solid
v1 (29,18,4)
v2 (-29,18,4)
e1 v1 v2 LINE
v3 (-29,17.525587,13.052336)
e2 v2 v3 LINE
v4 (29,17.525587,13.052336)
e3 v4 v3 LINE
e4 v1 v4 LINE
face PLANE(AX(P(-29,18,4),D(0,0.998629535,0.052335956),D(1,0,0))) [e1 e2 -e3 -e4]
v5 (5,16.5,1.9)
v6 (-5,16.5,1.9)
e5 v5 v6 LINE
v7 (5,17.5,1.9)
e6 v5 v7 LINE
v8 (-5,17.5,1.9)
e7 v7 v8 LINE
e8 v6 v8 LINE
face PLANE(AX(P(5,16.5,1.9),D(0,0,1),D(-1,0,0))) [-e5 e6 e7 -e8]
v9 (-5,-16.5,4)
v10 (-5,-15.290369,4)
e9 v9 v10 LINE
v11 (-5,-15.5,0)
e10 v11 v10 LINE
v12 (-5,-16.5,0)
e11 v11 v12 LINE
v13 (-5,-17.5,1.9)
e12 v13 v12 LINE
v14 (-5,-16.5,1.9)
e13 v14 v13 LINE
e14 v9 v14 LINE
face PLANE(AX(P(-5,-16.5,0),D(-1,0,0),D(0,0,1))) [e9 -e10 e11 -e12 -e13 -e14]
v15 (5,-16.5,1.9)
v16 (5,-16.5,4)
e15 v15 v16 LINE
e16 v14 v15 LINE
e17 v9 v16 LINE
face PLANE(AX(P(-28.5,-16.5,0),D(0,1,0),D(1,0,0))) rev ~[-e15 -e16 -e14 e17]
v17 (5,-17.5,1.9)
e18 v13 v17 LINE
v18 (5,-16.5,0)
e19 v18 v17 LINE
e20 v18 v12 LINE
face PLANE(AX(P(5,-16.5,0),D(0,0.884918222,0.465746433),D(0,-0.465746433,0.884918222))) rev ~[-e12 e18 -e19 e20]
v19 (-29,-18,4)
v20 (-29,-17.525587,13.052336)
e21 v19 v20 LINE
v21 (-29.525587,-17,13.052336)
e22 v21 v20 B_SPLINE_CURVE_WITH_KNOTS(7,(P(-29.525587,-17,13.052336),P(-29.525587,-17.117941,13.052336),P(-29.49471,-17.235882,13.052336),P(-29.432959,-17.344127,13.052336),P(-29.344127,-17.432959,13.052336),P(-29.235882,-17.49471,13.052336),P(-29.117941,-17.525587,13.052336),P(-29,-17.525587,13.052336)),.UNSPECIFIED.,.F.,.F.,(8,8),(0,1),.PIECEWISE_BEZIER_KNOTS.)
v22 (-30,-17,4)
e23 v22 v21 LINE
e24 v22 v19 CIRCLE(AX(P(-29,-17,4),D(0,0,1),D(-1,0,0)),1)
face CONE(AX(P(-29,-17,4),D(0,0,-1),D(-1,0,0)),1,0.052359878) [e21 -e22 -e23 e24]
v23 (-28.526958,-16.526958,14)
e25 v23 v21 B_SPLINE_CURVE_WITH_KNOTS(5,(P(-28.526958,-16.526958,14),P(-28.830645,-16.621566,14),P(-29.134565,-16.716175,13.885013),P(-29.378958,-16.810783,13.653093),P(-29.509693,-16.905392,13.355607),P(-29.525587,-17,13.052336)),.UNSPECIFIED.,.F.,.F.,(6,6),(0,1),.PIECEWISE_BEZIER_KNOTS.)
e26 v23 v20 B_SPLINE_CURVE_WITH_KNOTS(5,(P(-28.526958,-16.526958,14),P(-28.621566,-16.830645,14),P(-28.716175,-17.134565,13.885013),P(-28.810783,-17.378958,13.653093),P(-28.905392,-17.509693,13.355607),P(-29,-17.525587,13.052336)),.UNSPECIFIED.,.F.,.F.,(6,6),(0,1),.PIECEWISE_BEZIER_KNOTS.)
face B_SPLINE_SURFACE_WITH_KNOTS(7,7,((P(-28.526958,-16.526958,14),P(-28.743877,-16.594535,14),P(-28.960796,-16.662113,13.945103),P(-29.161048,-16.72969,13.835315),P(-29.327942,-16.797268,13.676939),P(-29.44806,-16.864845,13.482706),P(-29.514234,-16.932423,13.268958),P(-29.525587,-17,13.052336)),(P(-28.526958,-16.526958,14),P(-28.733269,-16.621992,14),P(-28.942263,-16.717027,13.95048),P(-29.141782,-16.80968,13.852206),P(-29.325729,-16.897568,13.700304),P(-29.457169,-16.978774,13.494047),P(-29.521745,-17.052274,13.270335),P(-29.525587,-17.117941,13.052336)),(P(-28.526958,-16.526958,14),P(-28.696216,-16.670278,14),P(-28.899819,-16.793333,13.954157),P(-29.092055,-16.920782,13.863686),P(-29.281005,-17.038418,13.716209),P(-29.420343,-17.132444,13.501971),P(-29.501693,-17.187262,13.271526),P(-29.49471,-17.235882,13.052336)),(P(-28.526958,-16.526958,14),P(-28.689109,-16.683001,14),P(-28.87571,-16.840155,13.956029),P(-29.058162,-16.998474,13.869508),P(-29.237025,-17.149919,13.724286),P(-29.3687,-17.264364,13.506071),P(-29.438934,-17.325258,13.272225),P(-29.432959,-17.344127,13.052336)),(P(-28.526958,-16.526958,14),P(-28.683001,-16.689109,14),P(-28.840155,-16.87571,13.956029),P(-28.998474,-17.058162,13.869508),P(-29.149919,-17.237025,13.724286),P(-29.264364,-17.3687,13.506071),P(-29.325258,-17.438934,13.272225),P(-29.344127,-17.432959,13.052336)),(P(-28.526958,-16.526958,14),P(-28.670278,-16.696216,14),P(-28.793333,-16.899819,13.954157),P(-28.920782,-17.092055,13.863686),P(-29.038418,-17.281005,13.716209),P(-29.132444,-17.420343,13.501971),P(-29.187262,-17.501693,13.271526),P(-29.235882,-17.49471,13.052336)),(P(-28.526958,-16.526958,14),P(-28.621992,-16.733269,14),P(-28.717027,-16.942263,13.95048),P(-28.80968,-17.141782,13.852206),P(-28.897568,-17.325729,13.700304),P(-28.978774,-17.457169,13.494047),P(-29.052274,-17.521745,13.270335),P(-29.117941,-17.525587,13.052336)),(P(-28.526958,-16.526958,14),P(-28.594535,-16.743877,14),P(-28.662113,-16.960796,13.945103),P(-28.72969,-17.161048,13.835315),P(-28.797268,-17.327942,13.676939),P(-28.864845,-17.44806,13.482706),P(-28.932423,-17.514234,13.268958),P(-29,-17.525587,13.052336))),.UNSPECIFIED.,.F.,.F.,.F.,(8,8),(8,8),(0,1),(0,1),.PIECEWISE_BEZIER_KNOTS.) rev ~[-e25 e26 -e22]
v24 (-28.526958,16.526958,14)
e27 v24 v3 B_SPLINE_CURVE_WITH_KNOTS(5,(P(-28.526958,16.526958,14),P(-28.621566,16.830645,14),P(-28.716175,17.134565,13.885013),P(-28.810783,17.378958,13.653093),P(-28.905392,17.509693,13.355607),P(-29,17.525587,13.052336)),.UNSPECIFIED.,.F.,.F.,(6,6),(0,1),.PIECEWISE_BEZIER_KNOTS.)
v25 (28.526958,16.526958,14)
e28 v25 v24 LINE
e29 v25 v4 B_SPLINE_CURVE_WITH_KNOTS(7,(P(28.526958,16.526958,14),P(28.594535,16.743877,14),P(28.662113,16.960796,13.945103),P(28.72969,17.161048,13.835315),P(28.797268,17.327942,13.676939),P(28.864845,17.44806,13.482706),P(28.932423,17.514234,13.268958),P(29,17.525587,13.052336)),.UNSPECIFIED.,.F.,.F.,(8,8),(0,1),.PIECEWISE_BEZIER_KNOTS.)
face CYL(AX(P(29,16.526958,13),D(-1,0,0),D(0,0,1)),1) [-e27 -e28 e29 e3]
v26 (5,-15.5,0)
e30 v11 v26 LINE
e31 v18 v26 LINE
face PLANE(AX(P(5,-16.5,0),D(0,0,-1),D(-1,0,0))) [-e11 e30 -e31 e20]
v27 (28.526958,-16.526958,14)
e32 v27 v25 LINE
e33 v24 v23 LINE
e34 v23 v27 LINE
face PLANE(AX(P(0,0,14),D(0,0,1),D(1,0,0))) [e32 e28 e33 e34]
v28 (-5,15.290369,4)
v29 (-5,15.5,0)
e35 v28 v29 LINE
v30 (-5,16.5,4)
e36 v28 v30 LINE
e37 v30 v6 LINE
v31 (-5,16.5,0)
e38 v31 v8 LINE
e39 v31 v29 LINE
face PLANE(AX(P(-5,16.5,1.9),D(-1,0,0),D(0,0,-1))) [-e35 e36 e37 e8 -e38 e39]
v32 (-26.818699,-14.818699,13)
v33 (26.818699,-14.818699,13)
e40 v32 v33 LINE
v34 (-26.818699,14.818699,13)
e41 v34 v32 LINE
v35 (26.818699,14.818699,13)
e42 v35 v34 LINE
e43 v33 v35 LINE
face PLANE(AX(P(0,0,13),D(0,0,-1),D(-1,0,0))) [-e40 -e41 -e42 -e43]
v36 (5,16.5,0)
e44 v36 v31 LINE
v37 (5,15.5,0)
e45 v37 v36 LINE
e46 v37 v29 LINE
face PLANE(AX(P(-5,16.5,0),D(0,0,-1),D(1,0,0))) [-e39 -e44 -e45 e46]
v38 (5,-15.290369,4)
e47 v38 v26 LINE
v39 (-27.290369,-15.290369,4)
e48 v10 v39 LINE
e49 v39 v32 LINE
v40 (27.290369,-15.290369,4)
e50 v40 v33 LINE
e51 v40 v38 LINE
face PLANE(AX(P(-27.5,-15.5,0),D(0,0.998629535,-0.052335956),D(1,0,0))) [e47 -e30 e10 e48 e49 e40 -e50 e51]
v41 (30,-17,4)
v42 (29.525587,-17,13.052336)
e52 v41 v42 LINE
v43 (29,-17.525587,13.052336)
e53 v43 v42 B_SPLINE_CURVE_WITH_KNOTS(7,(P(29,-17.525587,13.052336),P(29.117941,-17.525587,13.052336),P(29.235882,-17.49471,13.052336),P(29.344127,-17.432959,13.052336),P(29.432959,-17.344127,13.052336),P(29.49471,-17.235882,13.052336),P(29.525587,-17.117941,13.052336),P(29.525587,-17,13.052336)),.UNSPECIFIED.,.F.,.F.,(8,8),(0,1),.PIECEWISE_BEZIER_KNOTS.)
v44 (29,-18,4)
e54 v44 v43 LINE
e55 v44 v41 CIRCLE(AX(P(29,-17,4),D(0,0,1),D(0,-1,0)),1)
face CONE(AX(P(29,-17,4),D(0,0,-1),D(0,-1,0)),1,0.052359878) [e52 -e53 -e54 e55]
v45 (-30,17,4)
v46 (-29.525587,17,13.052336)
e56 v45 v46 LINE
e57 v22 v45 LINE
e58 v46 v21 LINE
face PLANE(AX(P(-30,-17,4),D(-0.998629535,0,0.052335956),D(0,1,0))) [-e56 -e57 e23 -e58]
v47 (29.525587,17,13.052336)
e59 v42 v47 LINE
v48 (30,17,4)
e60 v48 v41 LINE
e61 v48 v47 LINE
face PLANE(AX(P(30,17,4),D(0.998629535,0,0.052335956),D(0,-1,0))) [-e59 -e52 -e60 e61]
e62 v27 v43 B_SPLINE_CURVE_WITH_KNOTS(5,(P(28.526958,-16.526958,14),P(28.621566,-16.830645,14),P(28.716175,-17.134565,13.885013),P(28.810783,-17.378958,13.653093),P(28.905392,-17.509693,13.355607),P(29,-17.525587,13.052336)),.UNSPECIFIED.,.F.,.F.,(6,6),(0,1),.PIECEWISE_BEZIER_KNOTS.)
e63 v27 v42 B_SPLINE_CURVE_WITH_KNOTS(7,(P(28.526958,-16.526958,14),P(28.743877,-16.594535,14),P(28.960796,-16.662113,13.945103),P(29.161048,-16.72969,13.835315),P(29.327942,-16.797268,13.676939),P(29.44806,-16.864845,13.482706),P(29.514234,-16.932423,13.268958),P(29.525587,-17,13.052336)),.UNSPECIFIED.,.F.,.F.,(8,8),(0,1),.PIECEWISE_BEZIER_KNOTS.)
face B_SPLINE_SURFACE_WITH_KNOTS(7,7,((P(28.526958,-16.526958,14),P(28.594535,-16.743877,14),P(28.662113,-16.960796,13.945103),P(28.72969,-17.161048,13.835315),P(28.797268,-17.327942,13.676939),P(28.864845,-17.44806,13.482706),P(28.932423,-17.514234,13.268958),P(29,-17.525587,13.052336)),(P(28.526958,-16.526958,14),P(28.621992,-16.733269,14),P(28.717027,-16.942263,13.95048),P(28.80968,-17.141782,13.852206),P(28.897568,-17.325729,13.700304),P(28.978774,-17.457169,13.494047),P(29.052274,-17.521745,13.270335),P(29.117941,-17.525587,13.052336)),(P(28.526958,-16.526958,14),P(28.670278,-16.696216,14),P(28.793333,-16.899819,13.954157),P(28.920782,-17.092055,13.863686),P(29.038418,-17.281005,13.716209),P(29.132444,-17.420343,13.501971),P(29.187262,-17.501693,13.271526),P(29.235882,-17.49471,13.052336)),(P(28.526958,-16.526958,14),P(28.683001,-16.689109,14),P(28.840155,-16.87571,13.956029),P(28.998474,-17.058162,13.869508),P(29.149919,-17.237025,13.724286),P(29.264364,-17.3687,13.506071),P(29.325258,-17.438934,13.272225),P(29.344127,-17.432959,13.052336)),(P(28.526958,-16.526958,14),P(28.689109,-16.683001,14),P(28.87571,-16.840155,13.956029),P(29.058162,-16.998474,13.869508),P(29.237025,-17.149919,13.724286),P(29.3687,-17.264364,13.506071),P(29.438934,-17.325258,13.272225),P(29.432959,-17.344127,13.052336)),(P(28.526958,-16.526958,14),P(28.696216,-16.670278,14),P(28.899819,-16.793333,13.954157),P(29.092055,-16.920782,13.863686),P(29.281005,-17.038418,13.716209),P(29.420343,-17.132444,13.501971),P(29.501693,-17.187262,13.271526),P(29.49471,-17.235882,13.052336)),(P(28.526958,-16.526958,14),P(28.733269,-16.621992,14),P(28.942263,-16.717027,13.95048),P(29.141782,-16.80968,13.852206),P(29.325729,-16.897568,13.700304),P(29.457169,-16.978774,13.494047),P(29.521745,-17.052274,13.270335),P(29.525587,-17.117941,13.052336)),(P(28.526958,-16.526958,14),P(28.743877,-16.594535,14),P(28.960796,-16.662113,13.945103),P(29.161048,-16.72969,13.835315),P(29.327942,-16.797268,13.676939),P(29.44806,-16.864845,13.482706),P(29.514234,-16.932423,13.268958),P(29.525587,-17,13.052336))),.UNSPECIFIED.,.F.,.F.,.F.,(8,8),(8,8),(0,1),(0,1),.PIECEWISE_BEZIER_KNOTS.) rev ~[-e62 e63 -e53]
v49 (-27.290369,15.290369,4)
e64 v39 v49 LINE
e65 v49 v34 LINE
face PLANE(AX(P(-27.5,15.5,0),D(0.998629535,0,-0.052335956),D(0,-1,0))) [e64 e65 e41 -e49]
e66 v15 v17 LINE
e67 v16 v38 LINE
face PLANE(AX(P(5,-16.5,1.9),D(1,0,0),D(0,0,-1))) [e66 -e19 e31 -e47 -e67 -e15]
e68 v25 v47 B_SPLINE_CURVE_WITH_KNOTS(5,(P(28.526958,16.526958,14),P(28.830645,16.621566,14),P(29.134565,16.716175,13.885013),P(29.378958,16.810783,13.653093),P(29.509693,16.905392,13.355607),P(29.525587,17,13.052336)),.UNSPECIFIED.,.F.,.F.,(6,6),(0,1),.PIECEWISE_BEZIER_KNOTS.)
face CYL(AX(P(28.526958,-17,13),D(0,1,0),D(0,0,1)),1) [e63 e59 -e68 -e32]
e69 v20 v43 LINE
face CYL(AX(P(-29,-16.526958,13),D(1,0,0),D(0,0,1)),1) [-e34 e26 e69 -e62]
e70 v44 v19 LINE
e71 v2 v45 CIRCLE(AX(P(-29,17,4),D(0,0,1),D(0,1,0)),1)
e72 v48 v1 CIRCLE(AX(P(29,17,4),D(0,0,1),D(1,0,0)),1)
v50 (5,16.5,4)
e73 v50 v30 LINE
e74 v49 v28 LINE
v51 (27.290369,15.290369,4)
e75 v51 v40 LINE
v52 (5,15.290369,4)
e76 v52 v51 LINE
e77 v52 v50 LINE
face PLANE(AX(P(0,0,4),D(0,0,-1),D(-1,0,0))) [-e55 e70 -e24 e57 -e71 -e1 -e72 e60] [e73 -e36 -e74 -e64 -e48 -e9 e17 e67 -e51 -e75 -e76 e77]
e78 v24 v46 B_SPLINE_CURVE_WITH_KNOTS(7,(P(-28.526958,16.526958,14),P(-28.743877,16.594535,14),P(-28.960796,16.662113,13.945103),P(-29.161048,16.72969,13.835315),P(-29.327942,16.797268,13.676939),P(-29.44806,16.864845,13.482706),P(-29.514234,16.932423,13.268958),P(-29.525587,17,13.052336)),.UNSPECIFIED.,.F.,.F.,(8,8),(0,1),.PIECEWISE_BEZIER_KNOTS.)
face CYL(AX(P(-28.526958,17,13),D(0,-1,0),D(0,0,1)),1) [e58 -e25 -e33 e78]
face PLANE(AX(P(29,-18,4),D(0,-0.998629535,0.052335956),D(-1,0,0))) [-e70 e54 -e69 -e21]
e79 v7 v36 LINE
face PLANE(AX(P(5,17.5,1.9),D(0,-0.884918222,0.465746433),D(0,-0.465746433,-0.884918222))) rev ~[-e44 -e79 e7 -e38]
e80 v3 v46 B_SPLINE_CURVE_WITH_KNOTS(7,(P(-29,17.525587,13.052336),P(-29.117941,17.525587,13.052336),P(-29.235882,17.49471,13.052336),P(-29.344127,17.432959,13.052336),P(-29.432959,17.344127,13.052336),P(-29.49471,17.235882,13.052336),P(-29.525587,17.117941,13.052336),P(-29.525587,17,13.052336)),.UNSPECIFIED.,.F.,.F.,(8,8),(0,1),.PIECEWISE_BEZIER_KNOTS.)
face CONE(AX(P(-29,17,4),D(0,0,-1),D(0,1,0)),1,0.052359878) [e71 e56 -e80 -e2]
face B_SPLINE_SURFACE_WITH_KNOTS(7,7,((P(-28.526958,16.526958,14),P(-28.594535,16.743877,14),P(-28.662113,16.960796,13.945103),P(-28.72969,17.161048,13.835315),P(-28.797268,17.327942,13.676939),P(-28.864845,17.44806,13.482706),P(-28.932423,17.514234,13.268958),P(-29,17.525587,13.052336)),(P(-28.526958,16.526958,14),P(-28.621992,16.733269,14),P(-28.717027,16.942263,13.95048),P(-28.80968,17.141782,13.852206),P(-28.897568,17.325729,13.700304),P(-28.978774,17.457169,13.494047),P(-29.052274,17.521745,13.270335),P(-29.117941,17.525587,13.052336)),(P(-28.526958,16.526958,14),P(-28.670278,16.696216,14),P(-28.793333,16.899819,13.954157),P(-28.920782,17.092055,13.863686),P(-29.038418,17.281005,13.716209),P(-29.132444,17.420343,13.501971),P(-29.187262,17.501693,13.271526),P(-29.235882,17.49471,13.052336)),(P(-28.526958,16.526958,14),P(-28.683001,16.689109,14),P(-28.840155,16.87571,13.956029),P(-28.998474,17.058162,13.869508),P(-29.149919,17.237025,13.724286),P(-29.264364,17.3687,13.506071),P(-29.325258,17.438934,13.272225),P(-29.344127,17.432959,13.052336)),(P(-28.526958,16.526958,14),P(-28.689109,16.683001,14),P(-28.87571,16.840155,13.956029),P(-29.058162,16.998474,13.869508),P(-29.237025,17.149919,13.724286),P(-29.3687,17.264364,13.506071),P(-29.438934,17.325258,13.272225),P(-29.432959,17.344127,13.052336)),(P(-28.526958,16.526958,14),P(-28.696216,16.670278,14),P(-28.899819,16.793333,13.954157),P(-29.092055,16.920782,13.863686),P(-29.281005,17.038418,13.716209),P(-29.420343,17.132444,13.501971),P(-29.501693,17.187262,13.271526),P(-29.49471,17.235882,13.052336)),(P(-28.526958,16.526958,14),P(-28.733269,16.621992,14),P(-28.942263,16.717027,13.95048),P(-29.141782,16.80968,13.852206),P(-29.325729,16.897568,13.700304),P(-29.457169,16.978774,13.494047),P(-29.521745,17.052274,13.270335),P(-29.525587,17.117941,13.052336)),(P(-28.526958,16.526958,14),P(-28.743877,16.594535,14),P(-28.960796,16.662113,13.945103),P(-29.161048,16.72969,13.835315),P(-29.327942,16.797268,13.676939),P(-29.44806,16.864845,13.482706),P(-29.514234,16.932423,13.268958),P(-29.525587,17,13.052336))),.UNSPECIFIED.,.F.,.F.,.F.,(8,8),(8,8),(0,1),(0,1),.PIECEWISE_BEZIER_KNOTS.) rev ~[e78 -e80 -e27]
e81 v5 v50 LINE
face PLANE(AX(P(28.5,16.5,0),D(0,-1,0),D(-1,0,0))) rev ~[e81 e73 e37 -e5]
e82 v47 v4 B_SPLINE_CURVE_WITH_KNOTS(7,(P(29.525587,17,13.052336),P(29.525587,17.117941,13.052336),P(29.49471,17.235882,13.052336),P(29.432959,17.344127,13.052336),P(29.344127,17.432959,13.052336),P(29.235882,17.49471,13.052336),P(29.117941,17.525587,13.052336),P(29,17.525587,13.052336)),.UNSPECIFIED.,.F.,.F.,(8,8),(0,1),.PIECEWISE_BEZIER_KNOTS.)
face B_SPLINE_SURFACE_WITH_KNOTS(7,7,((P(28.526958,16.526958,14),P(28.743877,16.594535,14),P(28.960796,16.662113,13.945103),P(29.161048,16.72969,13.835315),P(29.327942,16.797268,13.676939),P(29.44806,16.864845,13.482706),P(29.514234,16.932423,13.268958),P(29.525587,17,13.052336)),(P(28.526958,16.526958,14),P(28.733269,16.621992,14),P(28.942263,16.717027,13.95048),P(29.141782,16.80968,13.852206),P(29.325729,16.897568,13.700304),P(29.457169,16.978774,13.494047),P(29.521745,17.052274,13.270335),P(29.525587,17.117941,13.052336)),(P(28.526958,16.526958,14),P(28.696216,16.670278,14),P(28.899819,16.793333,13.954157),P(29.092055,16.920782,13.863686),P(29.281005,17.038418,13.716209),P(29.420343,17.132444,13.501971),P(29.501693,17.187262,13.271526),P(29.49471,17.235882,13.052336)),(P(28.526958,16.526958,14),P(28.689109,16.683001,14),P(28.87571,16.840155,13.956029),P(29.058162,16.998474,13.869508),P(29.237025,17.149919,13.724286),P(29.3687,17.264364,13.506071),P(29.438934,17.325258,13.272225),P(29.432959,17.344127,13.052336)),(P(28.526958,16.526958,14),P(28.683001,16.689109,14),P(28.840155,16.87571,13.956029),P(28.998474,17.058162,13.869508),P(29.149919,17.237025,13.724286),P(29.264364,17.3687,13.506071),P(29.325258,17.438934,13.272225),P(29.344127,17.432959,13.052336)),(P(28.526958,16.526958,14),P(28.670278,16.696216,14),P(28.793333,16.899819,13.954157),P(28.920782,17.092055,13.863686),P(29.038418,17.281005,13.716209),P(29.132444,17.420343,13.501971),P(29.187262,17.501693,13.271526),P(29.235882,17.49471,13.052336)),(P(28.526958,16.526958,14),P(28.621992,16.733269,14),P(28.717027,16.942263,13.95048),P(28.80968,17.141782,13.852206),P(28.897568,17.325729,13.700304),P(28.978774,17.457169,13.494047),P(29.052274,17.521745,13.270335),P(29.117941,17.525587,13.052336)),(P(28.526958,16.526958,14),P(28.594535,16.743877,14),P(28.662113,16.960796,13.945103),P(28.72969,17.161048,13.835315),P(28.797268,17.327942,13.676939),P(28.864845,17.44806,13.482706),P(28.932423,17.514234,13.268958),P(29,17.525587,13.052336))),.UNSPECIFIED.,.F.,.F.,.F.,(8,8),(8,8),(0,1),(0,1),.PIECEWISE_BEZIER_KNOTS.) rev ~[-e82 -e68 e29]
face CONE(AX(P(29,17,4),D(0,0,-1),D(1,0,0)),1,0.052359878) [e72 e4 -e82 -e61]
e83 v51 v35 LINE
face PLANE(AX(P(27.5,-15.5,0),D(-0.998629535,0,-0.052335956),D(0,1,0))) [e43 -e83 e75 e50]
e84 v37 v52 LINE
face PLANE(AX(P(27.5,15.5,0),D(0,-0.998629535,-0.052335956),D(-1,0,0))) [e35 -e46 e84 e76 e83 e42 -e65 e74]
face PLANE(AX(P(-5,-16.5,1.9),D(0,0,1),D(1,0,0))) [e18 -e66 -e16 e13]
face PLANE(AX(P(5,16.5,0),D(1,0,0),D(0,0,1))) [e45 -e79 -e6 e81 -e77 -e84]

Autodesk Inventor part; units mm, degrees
ref_plane "YZ Plane" through (0, 0, 0) normal (1, 0, 0) x (0, 1, 0)
ref_plane "XZ Plane" through (0, 0, 0) normal (0, 1, 0) x (-1, 0, 0)
ref_plane "XY Plane" through (0, 0, 0) normal (0, 0, 1) x (1, 0, 0)
sketch "Эскиз1" plane through (0, 0, 0) normal (0, 0, 1) x (1, 0, 0)
  line L0 (-29, 18) -> (29, 18)
  line L1 (30, 17) -> (30, -17)
  line L2 (29, -18) -> (-29, -18)
  line L3 (-30, -17) -> (-30, 17)
  arc A0 (-29, 18) -> (-30, 17) centre (-29, 17) ccw
  arc A1 (-30, -17) -> (-29, -18) centre (-29, -17) ccw
  arc A2 (29, -18) -> (30, -17) centre (29, -17) ccw
  arc A3 (30, 17) -> (29, 18) centre (29, 17) ccw
  point P0 (0, 0)
  point P1 (-30, 18)
  point P2 (30, 18)
  point P3 (-30, -18)
  dimension "d0" = 60
  dimension "d1" = 36
  dimension "d2" = 18
  dimension "d3" = 30
  dimension "d4" = 1
extrude "Выдавливание1" add sketch "Эскиз1" along normal blind 4
sketch "Эскиз3" plane through (0, 0, 4) normal (0, 0, 1) x (1, 0, 0)
  line L0 (-29, 18) -> (29, 18)
  line L1 (30, 17) -> (30, -17)
  line L2 (29, -18) -> (-29, -18)
  line L3 (-30, -17) -> (-30, 17)
  line L4 (30, -17) -> (30, 17) projected
  line L5 (-29, -18) -> (29, -18) projected
  line L6 (-30, 17) -> (-30, -17) projected
  line L7 (29, 18) -> (-29, 18) projected
  arc A0 (-29, 18) -> (-30, 17) centre (-29, 17) ccw
  arc A1 (-30, -17) -> (-29, -18) centre (-29, -17) ccw
  arc A2 (29, -18) -> (30, -17) centre (29, -17) ccw
  arc A3 (30, 17) -> (29, 18) centre (29, 17) ccw
  point P0 (0, 0)
  dimension "d7" = 0
  dimension "d8" = 0
  dimension "d9" = 0
  dimension "d10" = 0
  dimension "d11" = 1
extrude "Выдавливание2" add sketch "Эскиз3" along normal blind 10 draft -3
sketch "Эскиз4" plane through (0, 0, 0) normal (0, 0, -1) x (-1, 0, 0)
  line L0 (-27.5, 15.5) -> (27.5, 15.5)
  line L1 (27.5, 15.5) -> (27.5, -15.5)
  line L2 (27.5, -15.5) -> (-27.5, -15.5)
  line L3 (-27.5, -15.5) -> (-27.5, 15.5)
  point P0 (0, 0)
  dimension "d14" = 15.5
  dimension "d15" = 31
  dimension "d16" = 27.5
  dimension "d17" = 55
extrude "Выдавливание3" cut sketch "Эскиз4" against normal blind 13 draft -3
sketch "Эскиз5" plane through (0, 0, 0) normal (0, 0, -1) x (-1, 0, 0)
  line L0 (-28.5, 16.5) -> (28.5, 16.5)
  line L1 (28.5, 16.5) -> (28.5, -16.5)
  line L2 (28.5, -16.5) -> (-28.5, -16.5)
  line L3 (-28.5, -16.5) -> (-28.5, 16.5)
  line L4 (-29, 18) -> (29, 18) projected
  line L5 (-30, -17) -> (-30, 17) projected
  line L6 (29, -18) -> (-29, -18) projected
  line L7 (30, 17) -> (30, -17) projected
  line L8 (-29, 18) -> (29, 18)
  line L9 (30, 17) -> (30, -17)
  line L10 (29, -18) -> (-29, -18)
  line L11 (-30, -17) -> (-30, 17)
  arc A0 (-29, 18) -> (-30, 17) centre (-29, 17) ccw
  arc A1 (-30, -17) -> (-29, -18) centre (-29, -17) ccw
  arc A2 (29, -18) -> (30, -17) centre (29, -17) ccw
  arc A3 (30, 17) -> (29, 18) centre (29, 17) ccw
  point P0 (0, 0)
  point P1 (29, 18)
  dimension "d20" = 1.5
  dimension "d21" = 1.5
  dimension "d22" = 1.5
  dimension "d23" = 1.5
  dimension "d24" = 0
  dimension "d25" = 0
  dimension "d26" = 0
  dimension "d27" = 0
  dimension "d28" = 1
extrude "Выдавливание4" cut sketch "Эскиз5" against normal blind 4
fillet "Сопряжение1" radius 1 8 edges at (-29.3365, -17.3365, 14) (-29.4759, 0, 14) (-29.3365, 17.3365, 14) (0, 17.4759, 14) (29.3365, 17.3365, 14) (29.4759, 0, 14) (29.3365, -17.3365, 14) (0, -17.4759, 14)
sketch "Эскиз6" plane through (-28.5, -16.5, 0) normal (0, -1, 0) x (1, 0, 0)
  line L0 (0, 4) -> (23.5, 4)
  line L1 (23.5, 4) -> (23.5, 0)
  line L2 (23.5, 0) -> (0, 0)
  line L3 (0, 0) -> (0, 4)
  line L4 (33.5, 4) -> (57, 4)
  line L5 (57, 4) -> (57, 0)
  line L6 (57, 0) -> (33.5, 0)
  line L7 (33.5, 0) -> (33.5, 4)
  line L8 (-0.5, 4) -> (57.5, 4) projected
  line L9 (57, 0) -> (0, 0) projected
  line L10 (0, 0) -> (0, 4) projected
  line L11 (57, 0) -> (57, 4) projected
  point P0 (28.5, 0)
  dimension "d32" = 0
  dimension "d33" = 0
  dimension "d34" = 0
  dimension "d35" = 23.5
  dimension "d36" = 0
  dimension "d37" = 23.5
extrude "Выдавливание5" cut sketch "Эскиз6" against normal through all contours L0 L1 L2 L3 | L4 L5 L6 L7
sketch "Эскиз8" plane through (-5, -16.5, 0) normal (0, -1, 0) x (1, 0, 0)
  line L0 (0, 1.9) -> (10, 1.9)
  line L1 (10, 1.9) -> (10, 0)
  line L2 (10, 0) -> (0, 0)
  line L3 (0, 0) -> (0, 1.9)
  line L4 (0, 4) -> (0, 0) projected
  line L5 (10, 0) -> (0, 0) projected
  line L6 (10, 0) -> (10, 4) projected
  point P0 (5, 0)
  dimension "d43" = 0
  dimension "d44" = 0
  dimension "d45" = 0
  dimension "d46" = 1.9
extrude "Выдавливание6" add sketch "Эскиз8" along normal blind 1
sketch "Эскиз9" plane through (-5, 16.5, 0) normal (0, 1, 0) x (1, 0, 0)
  line L0 (10, -1.9) -> (0, -1.9)
  line L1 (0, -1.9) -> (0, 0)
  line L2 (0, 0) -> (10, 0)
  line L3 (10, 0) -> (10, -1.9)
  line L4 (0, 0) -> (10, 0) projected
  line L5 (10, -4) -> (10, 0) projected
  line L6 (0, 0) -> (0, -4) projected
  point P0 (5, 0)
  dimension "d49" = 0
  dimension "d50" = 0
  dimension "d51" = 0
  dimension "d52" = 1.9
extrude "Выдавливание7" add sketch "Эскиз9" along normal blind 1
sketch "Эскиз10" plane through (5, -16.5, 4) normal (1, 0, 0) x (0, 0, -1)
  line L0 (4, 0) -> (2.1, -1)
  line L1 (4, 34) -> (2.1, 34) projected
  line L2 (2.1, 34) -> (4, 33)
  line L3 (2.1, 34) -> (4, 34)
  line L4 (4, 33) -> (4, 34)
  line L5 (2.1, -1) -> (4, -1) projected
  line L6 (2.1, -1) -> (4, -1)
  line L7 (4, -1) -> (4, 0)
  line L8 (4, -1) -> (4, 1) projected
  point P0 (4, 16.5)
extrude "Выдавливание8" cut sketch "Эскиз10" against normal through all
properties part number "case_up" material "Пластик АБС"
